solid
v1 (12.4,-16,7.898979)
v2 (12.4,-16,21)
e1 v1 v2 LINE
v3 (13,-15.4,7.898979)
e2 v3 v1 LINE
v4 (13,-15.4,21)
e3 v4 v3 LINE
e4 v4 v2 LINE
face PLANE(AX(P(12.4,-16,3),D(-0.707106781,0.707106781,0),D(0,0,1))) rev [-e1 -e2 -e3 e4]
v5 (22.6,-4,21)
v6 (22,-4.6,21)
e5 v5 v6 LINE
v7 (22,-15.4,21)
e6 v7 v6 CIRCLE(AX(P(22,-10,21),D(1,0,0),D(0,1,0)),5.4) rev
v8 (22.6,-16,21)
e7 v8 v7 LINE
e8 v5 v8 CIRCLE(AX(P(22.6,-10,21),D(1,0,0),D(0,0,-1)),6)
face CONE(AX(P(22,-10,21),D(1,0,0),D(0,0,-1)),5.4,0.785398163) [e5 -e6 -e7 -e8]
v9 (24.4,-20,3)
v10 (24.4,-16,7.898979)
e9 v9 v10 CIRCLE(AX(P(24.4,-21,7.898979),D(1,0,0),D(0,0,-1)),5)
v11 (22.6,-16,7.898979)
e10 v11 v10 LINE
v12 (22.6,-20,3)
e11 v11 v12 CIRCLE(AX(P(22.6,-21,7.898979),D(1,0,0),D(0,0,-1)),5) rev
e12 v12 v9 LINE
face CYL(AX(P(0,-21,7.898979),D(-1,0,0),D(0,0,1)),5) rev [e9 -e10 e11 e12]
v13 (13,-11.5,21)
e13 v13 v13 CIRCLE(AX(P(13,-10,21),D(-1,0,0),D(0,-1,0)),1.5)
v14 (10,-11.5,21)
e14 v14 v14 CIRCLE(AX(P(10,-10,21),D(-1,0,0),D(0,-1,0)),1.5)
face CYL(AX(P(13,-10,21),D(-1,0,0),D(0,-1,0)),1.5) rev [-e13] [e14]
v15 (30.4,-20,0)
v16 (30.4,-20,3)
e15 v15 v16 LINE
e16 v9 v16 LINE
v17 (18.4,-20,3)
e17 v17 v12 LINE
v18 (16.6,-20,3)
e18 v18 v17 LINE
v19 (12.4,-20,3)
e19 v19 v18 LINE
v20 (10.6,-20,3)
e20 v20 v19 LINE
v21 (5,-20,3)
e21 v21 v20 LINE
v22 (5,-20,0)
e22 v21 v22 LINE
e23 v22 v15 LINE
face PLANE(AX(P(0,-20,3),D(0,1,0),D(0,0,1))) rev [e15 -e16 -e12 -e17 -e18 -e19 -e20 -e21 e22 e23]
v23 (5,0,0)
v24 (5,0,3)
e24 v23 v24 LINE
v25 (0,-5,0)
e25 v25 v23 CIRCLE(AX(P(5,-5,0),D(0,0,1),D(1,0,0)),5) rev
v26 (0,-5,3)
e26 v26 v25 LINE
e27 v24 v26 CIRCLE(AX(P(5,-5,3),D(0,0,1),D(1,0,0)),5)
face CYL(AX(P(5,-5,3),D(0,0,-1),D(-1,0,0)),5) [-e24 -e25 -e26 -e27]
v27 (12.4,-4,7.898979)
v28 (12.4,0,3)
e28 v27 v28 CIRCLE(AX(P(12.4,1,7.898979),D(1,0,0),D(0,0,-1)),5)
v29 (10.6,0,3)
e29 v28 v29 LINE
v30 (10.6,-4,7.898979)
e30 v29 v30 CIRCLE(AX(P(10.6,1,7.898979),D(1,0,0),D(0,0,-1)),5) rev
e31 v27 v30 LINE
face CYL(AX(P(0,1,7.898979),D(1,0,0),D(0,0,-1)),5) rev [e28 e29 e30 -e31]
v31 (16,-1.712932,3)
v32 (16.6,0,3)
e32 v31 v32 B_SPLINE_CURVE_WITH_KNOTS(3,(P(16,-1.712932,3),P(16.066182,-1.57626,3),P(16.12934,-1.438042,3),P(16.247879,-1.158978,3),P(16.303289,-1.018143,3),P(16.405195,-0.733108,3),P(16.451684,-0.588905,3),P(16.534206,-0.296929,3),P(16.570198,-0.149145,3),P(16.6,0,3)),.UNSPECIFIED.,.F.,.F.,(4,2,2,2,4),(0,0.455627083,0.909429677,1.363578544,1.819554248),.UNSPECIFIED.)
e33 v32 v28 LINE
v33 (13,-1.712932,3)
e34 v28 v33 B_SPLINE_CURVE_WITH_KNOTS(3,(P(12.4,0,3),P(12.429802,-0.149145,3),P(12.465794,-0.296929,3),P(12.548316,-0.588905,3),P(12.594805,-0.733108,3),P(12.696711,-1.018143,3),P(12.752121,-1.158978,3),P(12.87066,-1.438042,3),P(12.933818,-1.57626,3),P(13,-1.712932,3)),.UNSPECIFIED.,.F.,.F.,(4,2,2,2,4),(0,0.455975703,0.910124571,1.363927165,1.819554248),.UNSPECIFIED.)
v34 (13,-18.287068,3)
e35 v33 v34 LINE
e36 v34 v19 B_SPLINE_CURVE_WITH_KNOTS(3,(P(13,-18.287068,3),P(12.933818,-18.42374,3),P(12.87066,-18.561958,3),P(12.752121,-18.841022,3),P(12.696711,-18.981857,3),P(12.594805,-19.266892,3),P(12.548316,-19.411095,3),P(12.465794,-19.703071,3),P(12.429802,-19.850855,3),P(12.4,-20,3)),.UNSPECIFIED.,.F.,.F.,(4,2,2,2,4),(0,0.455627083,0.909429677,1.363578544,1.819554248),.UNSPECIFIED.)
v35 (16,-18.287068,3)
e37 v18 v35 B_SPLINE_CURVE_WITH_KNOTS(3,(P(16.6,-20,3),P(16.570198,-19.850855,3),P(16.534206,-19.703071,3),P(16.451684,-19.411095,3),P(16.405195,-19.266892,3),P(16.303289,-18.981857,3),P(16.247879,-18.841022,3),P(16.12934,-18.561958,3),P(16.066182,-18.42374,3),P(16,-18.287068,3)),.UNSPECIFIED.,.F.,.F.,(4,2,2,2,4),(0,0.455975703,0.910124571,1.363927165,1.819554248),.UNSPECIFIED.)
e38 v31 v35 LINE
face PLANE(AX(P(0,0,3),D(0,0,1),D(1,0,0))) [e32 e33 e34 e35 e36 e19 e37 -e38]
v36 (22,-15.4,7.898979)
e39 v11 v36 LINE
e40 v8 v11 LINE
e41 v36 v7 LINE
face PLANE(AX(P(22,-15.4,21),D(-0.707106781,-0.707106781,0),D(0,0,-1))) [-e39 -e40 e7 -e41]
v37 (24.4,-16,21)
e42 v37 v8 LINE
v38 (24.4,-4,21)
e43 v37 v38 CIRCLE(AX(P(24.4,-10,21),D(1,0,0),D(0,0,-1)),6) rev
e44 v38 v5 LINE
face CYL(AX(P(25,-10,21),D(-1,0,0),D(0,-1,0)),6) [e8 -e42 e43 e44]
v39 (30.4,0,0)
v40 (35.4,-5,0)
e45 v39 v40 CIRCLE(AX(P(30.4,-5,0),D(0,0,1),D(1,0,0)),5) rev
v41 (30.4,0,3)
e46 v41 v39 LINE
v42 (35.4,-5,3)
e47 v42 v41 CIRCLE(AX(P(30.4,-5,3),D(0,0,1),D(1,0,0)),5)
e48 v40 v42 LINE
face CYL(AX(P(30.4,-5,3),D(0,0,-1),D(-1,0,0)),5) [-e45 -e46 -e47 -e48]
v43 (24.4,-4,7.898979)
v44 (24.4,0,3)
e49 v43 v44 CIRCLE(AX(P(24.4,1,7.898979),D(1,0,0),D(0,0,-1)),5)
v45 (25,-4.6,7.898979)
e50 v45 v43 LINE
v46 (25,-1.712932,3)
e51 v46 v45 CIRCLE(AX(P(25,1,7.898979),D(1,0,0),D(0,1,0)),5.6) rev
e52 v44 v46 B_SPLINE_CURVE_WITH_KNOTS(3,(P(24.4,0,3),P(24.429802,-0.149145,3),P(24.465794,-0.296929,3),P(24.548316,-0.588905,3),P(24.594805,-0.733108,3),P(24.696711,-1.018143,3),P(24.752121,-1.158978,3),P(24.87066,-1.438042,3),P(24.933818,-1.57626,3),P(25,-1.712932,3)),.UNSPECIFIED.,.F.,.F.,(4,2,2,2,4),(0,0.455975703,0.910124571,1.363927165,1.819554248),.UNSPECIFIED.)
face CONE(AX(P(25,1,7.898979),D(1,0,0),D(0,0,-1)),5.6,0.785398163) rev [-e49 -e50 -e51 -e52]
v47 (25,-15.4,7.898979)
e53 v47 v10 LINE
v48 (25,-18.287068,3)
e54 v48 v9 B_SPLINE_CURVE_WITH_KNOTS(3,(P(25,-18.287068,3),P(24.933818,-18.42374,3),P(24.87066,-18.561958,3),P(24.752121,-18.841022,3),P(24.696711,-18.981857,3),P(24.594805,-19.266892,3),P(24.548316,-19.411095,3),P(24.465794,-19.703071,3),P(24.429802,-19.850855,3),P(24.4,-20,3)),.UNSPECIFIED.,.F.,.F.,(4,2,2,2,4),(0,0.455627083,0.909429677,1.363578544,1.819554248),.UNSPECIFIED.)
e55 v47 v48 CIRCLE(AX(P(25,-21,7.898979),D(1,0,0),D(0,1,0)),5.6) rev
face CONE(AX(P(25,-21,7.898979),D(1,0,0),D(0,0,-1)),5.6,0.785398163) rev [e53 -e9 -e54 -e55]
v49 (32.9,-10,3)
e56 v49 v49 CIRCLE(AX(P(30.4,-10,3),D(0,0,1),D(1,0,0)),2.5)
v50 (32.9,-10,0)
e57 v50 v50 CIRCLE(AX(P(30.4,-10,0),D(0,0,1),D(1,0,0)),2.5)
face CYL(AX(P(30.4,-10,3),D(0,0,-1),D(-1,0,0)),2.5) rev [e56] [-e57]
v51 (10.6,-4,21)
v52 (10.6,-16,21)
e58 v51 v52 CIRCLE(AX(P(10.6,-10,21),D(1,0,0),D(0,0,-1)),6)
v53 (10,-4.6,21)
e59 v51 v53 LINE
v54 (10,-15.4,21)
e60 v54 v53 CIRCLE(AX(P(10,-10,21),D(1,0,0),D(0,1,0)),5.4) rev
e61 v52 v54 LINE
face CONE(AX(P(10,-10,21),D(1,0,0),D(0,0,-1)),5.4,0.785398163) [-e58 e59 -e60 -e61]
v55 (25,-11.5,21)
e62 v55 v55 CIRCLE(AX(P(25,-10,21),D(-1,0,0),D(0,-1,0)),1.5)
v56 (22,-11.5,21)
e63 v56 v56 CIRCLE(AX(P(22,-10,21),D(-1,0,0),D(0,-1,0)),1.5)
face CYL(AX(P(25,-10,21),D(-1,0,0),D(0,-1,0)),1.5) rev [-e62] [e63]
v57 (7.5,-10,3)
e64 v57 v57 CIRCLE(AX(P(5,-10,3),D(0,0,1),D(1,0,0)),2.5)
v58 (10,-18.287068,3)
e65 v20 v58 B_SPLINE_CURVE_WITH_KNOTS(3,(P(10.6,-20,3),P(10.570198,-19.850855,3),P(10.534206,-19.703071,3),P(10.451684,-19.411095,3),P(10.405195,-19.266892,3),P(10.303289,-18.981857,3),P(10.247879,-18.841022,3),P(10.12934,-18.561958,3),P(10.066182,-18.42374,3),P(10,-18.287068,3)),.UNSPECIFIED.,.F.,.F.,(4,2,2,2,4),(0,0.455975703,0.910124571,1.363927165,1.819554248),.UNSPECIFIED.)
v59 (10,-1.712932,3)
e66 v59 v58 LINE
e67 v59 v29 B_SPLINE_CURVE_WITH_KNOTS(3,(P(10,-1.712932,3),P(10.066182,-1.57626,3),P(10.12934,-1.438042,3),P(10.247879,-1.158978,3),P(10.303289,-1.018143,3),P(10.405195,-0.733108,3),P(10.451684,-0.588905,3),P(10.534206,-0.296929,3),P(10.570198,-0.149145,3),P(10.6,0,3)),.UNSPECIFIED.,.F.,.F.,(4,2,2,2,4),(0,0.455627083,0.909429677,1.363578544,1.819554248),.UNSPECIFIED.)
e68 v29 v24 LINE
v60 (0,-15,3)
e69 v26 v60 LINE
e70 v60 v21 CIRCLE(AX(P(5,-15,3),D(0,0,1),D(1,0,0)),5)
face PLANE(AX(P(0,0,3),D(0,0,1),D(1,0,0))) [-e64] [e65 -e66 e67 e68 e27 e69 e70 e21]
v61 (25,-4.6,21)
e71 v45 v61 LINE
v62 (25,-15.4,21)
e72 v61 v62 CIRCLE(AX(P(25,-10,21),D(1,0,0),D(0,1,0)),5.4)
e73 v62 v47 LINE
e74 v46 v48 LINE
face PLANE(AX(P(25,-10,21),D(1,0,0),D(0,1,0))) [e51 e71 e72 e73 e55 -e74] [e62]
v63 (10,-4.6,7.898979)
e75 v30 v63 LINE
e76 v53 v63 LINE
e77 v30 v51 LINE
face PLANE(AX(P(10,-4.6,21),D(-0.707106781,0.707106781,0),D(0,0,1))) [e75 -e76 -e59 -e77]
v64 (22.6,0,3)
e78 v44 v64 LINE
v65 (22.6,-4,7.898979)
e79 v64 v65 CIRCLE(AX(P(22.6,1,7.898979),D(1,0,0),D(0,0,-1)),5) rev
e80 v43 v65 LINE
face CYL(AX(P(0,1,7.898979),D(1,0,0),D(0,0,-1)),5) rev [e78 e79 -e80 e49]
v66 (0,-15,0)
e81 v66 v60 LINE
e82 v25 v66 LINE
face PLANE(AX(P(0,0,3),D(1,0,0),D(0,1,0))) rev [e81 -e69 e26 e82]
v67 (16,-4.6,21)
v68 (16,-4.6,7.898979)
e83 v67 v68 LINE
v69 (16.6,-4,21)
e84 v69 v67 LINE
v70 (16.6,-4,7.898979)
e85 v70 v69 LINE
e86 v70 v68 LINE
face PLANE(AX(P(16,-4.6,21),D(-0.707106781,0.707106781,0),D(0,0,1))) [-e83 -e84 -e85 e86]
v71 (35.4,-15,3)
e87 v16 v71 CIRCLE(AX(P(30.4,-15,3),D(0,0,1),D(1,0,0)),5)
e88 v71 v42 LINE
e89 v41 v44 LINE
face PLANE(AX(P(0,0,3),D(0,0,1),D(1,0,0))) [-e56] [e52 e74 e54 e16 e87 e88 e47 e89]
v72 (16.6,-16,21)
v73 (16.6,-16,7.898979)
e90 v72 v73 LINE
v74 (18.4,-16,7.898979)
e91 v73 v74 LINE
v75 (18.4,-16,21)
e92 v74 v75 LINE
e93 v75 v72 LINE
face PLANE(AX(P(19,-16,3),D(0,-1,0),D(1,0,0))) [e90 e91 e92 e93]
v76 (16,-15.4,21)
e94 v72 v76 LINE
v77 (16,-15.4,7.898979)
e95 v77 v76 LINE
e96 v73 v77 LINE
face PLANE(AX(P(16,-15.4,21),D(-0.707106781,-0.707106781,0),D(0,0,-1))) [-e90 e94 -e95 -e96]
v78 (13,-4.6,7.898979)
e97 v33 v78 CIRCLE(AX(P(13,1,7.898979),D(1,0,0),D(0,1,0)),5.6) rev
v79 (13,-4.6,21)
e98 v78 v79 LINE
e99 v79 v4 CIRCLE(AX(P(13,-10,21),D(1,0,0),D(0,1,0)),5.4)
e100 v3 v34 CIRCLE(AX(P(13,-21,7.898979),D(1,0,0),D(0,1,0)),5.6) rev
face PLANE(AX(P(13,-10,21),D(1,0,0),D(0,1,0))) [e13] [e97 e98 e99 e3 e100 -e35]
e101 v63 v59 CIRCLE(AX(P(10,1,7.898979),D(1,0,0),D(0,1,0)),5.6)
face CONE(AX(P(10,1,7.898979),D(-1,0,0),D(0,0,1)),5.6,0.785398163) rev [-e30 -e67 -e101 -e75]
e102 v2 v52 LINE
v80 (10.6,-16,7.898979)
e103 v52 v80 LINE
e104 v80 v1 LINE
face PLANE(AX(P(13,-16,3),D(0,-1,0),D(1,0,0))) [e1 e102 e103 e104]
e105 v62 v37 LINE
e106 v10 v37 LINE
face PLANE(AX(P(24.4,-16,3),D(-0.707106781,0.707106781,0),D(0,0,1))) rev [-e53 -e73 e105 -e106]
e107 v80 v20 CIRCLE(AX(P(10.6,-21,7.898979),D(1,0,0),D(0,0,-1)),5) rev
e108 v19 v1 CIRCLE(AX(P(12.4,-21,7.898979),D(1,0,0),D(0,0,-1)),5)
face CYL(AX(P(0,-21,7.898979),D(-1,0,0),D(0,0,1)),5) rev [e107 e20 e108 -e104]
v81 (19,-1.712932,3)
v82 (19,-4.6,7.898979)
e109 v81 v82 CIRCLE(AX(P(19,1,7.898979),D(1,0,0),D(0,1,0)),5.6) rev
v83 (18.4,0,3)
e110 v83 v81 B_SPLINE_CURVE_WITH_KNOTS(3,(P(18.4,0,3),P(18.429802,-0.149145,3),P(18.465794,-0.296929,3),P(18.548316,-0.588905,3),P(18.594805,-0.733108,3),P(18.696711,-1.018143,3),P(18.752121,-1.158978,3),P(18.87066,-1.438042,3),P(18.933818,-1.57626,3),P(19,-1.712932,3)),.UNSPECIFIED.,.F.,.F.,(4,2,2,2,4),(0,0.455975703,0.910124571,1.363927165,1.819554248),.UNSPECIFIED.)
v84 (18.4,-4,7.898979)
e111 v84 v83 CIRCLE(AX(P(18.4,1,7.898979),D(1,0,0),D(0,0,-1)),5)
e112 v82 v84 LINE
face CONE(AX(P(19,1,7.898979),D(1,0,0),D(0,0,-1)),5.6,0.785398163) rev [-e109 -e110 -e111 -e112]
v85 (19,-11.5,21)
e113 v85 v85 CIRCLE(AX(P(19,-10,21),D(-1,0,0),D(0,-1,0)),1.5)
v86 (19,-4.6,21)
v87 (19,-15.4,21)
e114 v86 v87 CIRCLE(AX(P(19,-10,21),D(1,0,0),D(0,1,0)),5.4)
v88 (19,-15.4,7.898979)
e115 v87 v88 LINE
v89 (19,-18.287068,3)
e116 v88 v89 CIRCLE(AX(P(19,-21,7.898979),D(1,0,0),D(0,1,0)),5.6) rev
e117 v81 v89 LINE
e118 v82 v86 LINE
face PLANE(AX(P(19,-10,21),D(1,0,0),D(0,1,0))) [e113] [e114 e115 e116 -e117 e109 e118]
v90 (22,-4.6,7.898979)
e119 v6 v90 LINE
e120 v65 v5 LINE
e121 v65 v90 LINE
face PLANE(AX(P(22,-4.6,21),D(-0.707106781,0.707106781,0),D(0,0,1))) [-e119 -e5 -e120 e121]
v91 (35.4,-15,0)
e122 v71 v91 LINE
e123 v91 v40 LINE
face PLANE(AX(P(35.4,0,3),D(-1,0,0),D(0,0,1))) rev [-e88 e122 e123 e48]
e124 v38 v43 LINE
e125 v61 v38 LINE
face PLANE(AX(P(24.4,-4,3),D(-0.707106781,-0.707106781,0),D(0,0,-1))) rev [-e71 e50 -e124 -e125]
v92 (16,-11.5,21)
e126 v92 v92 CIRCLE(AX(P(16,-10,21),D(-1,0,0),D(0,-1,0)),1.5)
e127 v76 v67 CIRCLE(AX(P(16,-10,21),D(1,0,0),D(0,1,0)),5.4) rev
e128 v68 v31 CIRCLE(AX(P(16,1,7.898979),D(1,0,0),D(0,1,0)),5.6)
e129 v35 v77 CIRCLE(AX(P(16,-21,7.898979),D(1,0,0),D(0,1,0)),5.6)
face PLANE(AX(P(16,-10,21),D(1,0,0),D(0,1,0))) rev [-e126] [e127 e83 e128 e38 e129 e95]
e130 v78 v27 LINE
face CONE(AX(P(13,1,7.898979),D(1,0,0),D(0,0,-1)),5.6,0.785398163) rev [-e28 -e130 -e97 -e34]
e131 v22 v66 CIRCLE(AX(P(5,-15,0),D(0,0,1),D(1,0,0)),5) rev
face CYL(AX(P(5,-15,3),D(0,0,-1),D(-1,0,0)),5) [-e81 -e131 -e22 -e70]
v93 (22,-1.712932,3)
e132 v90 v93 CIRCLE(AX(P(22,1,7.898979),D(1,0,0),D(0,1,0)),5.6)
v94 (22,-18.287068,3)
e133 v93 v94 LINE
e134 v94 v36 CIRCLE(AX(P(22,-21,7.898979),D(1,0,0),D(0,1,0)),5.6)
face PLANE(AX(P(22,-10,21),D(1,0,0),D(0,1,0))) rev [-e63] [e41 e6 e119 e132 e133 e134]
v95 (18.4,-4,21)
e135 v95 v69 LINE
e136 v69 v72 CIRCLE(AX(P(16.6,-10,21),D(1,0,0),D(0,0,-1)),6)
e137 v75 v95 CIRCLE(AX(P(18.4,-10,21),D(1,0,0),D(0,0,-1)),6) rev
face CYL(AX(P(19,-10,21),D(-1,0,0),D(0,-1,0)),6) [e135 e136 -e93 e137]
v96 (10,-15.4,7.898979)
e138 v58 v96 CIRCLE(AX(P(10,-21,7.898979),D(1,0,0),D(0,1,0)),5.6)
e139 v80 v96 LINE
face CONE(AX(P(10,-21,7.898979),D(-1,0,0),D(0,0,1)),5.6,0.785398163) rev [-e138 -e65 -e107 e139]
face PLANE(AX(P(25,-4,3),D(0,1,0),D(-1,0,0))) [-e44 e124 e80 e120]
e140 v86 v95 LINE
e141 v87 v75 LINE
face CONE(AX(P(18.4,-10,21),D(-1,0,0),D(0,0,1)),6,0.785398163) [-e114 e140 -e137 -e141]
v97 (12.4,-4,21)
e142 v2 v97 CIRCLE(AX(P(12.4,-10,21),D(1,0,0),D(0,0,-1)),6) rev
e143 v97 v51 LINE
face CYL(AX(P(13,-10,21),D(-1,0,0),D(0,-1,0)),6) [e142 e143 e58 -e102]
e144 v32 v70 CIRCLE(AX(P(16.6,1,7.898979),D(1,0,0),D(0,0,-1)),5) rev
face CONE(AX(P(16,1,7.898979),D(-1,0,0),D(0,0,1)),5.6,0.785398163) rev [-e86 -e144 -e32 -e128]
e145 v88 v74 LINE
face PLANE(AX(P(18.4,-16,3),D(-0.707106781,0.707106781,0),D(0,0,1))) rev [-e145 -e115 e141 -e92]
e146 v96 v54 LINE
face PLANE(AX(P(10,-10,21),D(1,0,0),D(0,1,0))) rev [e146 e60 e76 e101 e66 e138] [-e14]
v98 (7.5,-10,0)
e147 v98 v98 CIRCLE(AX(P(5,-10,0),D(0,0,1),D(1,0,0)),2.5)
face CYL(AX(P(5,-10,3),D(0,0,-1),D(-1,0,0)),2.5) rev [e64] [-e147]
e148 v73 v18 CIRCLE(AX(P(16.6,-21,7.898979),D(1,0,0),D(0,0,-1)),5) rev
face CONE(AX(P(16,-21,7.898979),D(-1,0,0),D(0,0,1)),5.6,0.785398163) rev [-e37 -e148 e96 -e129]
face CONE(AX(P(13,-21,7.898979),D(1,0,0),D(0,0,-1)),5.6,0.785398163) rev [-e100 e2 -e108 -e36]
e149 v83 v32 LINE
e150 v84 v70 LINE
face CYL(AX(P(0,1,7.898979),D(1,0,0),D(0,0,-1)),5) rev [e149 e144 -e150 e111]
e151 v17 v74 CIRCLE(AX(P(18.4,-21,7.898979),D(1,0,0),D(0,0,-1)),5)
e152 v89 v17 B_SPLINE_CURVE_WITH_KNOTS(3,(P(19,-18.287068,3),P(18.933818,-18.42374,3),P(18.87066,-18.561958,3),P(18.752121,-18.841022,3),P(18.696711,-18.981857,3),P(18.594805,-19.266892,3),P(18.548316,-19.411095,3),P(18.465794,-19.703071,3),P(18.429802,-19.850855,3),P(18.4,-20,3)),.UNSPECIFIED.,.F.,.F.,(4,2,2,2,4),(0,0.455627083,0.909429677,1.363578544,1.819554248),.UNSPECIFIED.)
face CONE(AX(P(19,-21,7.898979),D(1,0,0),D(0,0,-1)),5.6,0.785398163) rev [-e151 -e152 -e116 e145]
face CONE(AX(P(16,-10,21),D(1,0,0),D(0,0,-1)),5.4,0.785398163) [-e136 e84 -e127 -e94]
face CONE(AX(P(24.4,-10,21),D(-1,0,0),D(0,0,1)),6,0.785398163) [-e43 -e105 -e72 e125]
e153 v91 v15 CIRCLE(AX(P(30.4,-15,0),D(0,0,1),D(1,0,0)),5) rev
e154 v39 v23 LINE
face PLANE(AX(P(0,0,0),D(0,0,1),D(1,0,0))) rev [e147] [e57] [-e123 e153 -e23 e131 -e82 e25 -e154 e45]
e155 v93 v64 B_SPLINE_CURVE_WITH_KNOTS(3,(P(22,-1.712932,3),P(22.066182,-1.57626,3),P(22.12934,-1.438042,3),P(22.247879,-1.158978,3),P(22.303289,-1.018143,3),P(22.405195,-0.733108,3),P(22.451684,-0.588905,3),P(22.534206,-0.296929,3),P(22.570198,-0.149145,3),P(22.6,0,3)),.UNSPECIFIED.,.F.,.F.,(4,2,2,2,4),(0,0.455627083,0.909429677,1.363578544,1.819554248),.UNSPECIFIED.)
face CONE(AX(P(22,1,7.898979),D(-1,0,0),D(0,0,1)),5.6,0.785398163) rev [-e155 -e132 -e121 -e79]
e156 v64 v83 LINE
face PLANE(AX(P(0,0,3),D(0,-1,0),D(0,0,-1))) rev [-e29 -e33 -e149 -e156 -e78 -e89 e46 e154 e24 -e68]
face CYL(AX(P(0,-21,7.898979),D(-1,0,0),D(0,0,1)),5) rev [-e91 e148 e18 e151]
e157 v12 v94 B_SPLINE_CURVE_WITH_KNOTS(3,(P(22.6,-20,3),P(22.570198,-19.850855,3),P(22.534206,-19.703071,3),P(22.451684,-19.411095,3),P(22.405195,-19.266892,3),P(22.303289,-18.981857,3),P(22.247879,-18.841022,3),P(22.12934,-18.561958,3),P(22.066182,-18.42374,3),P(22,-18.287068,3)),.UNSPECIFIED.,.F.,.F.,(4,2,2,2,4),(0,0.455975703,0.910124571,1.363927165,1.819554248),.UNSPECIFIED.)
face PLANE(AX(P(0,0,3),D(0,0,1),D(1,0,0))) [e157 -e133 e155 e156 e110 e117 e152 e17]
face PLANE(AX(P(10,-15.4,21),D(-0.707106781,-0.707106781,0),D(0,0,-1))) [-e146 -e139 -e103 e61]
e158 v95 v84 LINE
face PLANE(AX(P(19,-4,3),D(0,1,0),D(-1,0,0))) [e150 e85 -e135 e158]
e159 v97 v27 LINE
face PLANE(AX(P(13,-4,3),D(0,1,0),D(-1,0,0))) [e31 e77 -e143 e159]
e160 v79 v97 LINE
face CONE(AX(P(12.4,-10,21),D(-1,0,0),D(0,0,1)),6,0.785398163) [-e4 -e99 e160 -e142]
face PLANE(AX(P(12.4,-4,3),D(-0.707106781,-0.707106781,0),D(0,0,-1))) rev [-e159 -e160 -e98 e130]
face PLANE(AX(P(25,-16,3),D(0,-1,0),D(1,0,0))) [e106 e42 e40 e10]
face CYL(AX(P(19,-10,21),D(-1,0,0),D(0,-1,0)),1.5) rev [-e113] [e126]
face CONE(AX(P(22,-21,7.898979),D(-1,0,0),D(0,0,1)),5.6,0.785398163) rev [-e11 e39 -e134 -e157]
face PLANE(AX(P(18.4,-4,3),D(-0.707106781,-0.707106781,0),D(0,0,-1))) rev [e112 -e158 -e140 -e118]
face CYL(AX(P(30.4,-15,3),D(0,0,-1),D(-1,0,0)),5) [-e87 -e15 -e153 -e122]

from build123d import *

# Parameters (mm, degrees)
SKETCH_1_W             = 35.4
SKETCH_1_H             = 20
SKETCH_1_R             = 2.5
EXTRUDE_1_DEPTH        = 3
EXTRUDE_START          = -10
SKETCH_3_R             = 1.5
EXTRUDE_2_DEPTH        = 3
PATTERN_LINEAR_1_COUNT = 3
PATTERN_LINEAR_1_PITCH = 6
FILLET_1_R             = 5
CHAMFER_1_SIZE         = 0.6


with BuildPart() as part:
    # 草图1 → 凸台-拉伸1 (new body)
    with BuildSketch(Plane.XY):
        with Locations((17.7, -10)):
            Rectangle(SKETCH_1_W, SKETCH_1_H)
        with Locations((5, -10)):
            Circle(SKETCH_1_R, mode=Mode.SUBTRACT)
        with Locations((30.4, -10)):
            Circle(SKETCH_1_R, mode=Mode.SUBTRACT)
    extrude(amount=EXTRUDE_1_DEPTH)

    # 草图3 → 凸台-拉伸2 (add)
    with BuildSketch(Plane.ZY.offset(EXTRUDE_START)):
        with BuildLine():
            Line((3, -4), (21, -4))
            ThreePointArc((21, -4), (27, -10), (21, -16))
            Line((21, -16), (3, -16))
            Line((3, -16), (3, -4))
        make_face()
        with Locations(Location((21, -10, 0), (0, 0, 270))):
            Circle(SKETCH_3_R, mode=Mode.SUBTRACT)
    extrude_2 = extrude(amount=-EXTRUDE_2_DEPTH)

    # 阵列(线性)1: 凸台-拉伸2 ×3
    with Locations(*[(i * PATTERN_LINEAR_1_PITCH, 0, 0) for i in range(1, PATTERN_LINEAR_1_COUNT)]):
        add(extrude_2)

    # 圆角1
    # the kernel refuses this fillet: 5 mm, written as the material it adds along each edge
    with BuildSketch(Plane(origin=(10, -16, 3), x_dir=(0, -1.0, 1.572297847473644e-12), z_dir=(1, 0, 0)), Plane(origin=(16, -16, 3), x_dir=(0, -1.0, 1.572297847473644e-12), z_dir=(1, 0, 0)), Plane(origin=(22, -16, 3), x_dir=(0, -1.0, 1.572297847473644e-12), z_dir=(1, 0, 0))) as fillet_1_piece_1:
        with BuildLine():
            CenterArc((5, -4.898979486), FILLET_1_R, 101.536959033, 78.463040967)
            Line((0, -4.898979486), (0, 0))
            Line((0, 0), (4, 0))
        make_face()
    extrude(amount=3)
    with BuildSketch(Plane(origin=(-2.247448714, -16, 3), x_dir=(0, -1.0, 1.572297847473644e-12), z_dir=(1, 0, 0))) as fillet_1_piece_2_section:
        with BuildLine():
            CenterArc((5, -4.898979486), FILLET_1_R, 101.536959033, 78.463040967)
            Line((0, -4.898979486), (0, 0))
            Line((0, 0), (4, 0))
        make_face()
    fillet_1_piece_2 = extrude(amount=27.494897428, mode=Mode.PRIVATE)
    fillet_1_piece_2 = split(fillet_1_piece_2, bisect_by=Plane(origin=(16, -16, 3), z_dir=(1, 0, 0)), keep=Keep.TOP, mode=Mode.PRIVATE)
    fillet_1_piece_2 = split(fillet_1_piece_2, bisect_by=Plane(origin=(19, -16, 3), z_dir=(-1, 0, 0)), keep=Keep.TOP, mode=Mode.PRIVATE)
    add(fillet_1_piece_2)
    with BuildSketch(Plane(origin=(-2.247448714, -16, 3), x_dir=(0, -1.0, 1.572297847473644e-12), z_dir=(1, 0, 0))) as fillet_1_piece_3_section:
        with BuildLine():
            CenterArc((5, -4.898979486), FILLET_1_R, 101.536959033, 78.463040967)
            Line((0, -4.898979486), (0, 0))
            Line((0, 0), (4, 0))
        make_face()
    fillet_1_piece_3 = extrude(amount=27.494897428, mode=Mode.PRIVATE)
    fillet_1_piece_3 = split(fillet_1_piece_3, bisect_by=Plane(origin=(25, -16, 3), z_dir=(-1, 0, 0)), keep=Keep.TOP, mode=Mode.PRIVATE)
    fillet_1_piece_3 = split(fillet_1_piece_3, bisect_by=Plane(origin=(22, -16, 3), z_dir=(1, 0, 0)), keep=Keep.TOP, mode=Mode.PRIVATE)
    add(fillet_1_piece_3)
    with BuildSketch(Plane(origin=(10, -4, 3), x_dir=(0, 1.0, 1.568078999980068e-12), z_dir=(1, 0, 0)), Plane(origin=(16, -4, 3), x_dir=(0, 1.0, 1.568078999980068e-12), z_dir=(1, 0, 0)), Plane(origin=(22, -4, 3), x_dir=(0, 1.0, 1.568078999980068e-12), z_dir=(1, 0, 0))) as fillet_1_piece_4:
        with BuildLine():
            CenterArc((5, 4.898979486), FILLET_1_R, 180, 78.463040967)
            Line((0, 4.898979486), (0, 0))
            Line((0, 0), (4, 0))
        make_face()
    extrude(amount=3)
    with BuildSketch(Plane(origin=(-2.247448714, -4, 3), x_dir=(0, 1.0, 1.568078999980068e-12), z_dir=(1, 0, 0))) as fillet_1_piece_5_section:
        with BuildLine():
            CenterArc((5, 4.898979486), FILLET_1_R, 180, 78.463040967)
            Line((0, 4.898979486), (0, 0))
            Line((0, 0), (4, 0))
        make_face()
    fillet_1_piece_5 = extrude(amount=27.494897428, mode=Mode.PRIVATE)
    fillet_1_piece_5 = split(fillet_1_piece_5, bisect_by=Plane(origin=(16, -4, 3), z_dir=(1, 0, 0)), keep=Keep.TOP, mode=Mode.PRIVATE)
    fillet_1_piece_5 = split(fillet_1_piece_5, bisect_by=Plane(origin=(19, -4, 3), z_dir=(-1, 0, 0)), keep=Keep.TOP, mode=Mode.PRIVATE)
    add(fillet_1_piece_5)
    with BuildSketch(Plane(origin=(-2.247448714, -4, 3), x_dir=(0, 1.0, 1.568078999980068e-12), z_dir=(1, 0, 0))) as fillet_1_piece_6_section:
        with BuildLine():
            CenterArc((5, 4.898979486), FILLET_1_R, 180, 78.463040967)
            Line((0, 4.898979486), (0, 0))
            Line((0, 0), (4, 0))
        make_face()
    fillet_1_piece_6 = extrude(amount=27.494897428, mode=Mode.PRIVATE)
    fillet_1_piece_6 = split(fillet_1_piece_6, bisect_by=Plane(origin=(25, -4, 3), z_dir=(-1, 0, 0)), keep=Keep.TOP, mode=Mode.PRIVATE)
    fillet_1_piece_6 = split(fillet_1_piece_6, bisect_by=Plane(origin=(22, -4, 3), z_dir=(1, 0, 0)), keep=Keep.TOP, mode=Mode.PRIVATE)
    add(fillet_1_piece_6)
    with BuildSketch(Plane(origin=(3.752551286, -16, 3), x_dir=(0, -1.0, 1.572297847473644e-12), z_dir=(1, 0, 0))) as fillet_1_piece_7_section:
        with BuildLine():
            CenterArc((5, -4.898979486), FILLET_1_R, 101.536959033, 78.463040967)
            Line((0, -4.898979486), (0, 0))
            Line((0, 0), (4, 0))
        make_face()
    fillet_1_piece_7 = extrude(amount=27.494897428, mode=Mode.PRIVATE)
    fillet_1_piece_7 = split(fillet_1_piece_7, bisect_by=Plane(origin=(10, -16, 3), z_dir=(1, 0, 0)), keep=Keep.TOP, mode=Mode.PRIVATE)
    fillet_1_piece_7 = split(fillet_1_piece_7, bisect_by=Plane(origin=(13, -16, 3), z_dir=(-1, 0, 0)), keep=Keep.TOP, mode=Mode.PRIVATE)
    add(fillet_1_piece_7)
    with BuildSketch(Plane(origin=(3.752551286, -16, 3), x_dir=(0, -1.0, 1.572297847473644e-12), z_dir=(1, 0, 0))) as fillet_1_piece_8_section:
        with BuildLine():
            CenterArc((5, -4.898979486), FILLET_1_R, 101.536959033, 78.463040967)
            Line((0, -4.898979486), (0, 0))
            Line((0, 0), (4, 0))
        make_face()
    fillet_1_piece_8 = extrude(amount=27.494897428, mode=Mode.PRIVATE)
    fillet_1_piece_8 = split(fillet_1_piece_8, bisect_by=Plane(origin=(25, -16, 3), z_dir=(-1, 0, 0)), keep=Keep.TOP, mode=Mode.PRIVATE)
    fillet_1_piece_8 = split(fillet_1_piece_8, bisect_by=Plane(origin=(22, -16, 3), z_dir=(1, 0, 0)), keep=Keep.TOP, mode=Mode.PRIVATE)
    add(fillet_1_piece_8)
    with BuildSketch(Plane(origin=(3.752551286, -4, 3), x_dir=(0, 1.0, 1.568078999980068e-12), z_dir=(1, 0, 0))) as fillet_1_piece_9_section:
        with BuildLine():
            CenterArc((5, 4.898979486), FILLET_1_R, 180, 78.463040967)
            Line((0, 4.898979486), (0, 0))
            Line((0, 0), (4, 0))
        make_face()
    fillet_1_piece_9 = extrude(amount=27.494897428, mode=Mode.PRIVATE)
    fillet_1_piece_9 = split(fillet_1_piece_9, bisect_by=Plane(origin=(10, -4, 3), z_dir=(1, 0, 0)), keep=Keep.TOP, mode=Mode.PRIVATE)
    fillet_1_piece_9 = split(fillet_1_piece_9, bisect_by=Plane(origin=(13, -4, 3), z_dir=(-1, 0, 0)), keep=Keep.TOP, mode=Mode.PRIVATE)
    add(fillet_1_piece_9)
    with BuildSketch(Plane(origin=(3.752551286, -4, 3), x_dir=(0, 1.0, 1.568078999980068e-12), z_dir=(1, 0, 0))) as fillet_1_piece_10_section:
        with BuildLine():
            CenterArc((5, 4.898979486), FILLET_1_R, 180, 78.463040967)
            Line((0, 4.898979486), (0, 0))
            Line((0, 0), (4, 0))
        make_face()
    fillet_1_piece_10 = extrude(amount=27.494897428, mode=Mode.PRIVATE)
    fillet_1_piece_10 = split(fillet_1_piece_10, bisect_by=Plane(origin=(25, -4, 3), z_dir=(-1, 0, 0)), keep=Keep.TOP, mode=Mode.PRIVATE)
    fillet_1_piece_10 = split(fillet_1_piece_10, bisect_by=Plane(origin=(22, -4, 3), z_dir=(1, 0, 0)), keep=Keep.TOP, mode=Mode.PRIVATE)
    add(fillet_1_piece_10)
    with BuildSketch(Plane(origin=(9.752551286, -16, 3), x_dir=(0, -1.0, 1.572297847473644e-12), z_dir=(1, 0, 0))) as fillet_1_piece_11_section:
        with BuildLine():
            CenterArc((5, -4.898979486), FILLET_1_R, 101.536959033, 78.463040967)
            Line((0, -4.898979486), (0, 0))
            Line((0, 0), (4, 0))
        make_face()
    fillet_1_piece_11 = extrude(amount=27.494897428, mode=Mode.PRIVATE)
    fillet_1_piece_11 = split(fillet_1_piece_11, bisect_by=Plane(origin=(10, -16, 3), z_dir=(1, 0, 0)), keep=Keep.TOP, mode=Mode.PRIVATE)
    fillet_1_piece_11 = split(fillet_1_piece_11, bisect_by=Plane(origin=(13, -16, 3), z_dir=(-1, 0, 0)), keep=Keep.TOP, mode=Mode.PRIVATE)
    add(fillet_1_piece_11)
    with BuildSketch(Plane(origin=(9.752551286, -16, 3), x_dir=(0, -1.0, 1.572297847473644e-12), z_dir=(1, 0, 0))) as fillet_1_piece_12_section:
        with BuildLine():
            CenterArc((5, -4.898979486), FILLET_1_R, 101.536959033, 78.463040967)
            Line((0, -4.898979486), (0, 0))
            Line((0, 0), (4, 0))
        make_face()
    fillet_1_piece_12 = extrude(amount=27.494897428, mode=Mode.PRIVATE)
    fillet_1_piece_12 = split(fillet_1_piece_12, bisect_by=Plane(origin=(16, -16, 3), z_dir=(1, 0, 0)), keep=Keep.TOP, mode=Mode.PRIVATE)
    fillet_1_piece_12 = split(fillet_1_piece_12, bisect_by=Plane(origin=(19, -16, 3), z_dir=(-1, 0, 0)), keep=Keep.TOP, mode=Mode.PRIVATE)
    add(fillet_1_piece_12)
    with BuildSketch(Plane(origin=(9.752551286, -4, 3), x_dir=(0, 1.0, 1.568078999980068e-12), z_dir=(1, 0, 0))) as fillet_1_piece_13_section:
        with BuildLine():
            CenterArc((5, 4.898979486), FILLET_1_R, 180, 78.463040967)
            Line((0, 4.898979486), (0, 0))
            Line((0, 0), (4, 0))
        make_face()
    fillet_1_piece_13 = extrude(amount=27.494897428, mode=Mode.PRIVATE)
    fillet_1_piece_13 = split(fillet_1_piece_13, bisect_by=Plane(origin=(10, -4, 3), z_dir=(1, 0, 0)), keep=Keep.TOP, mode=Mode.PRIVATE)
    fillet_1_piece_13 = split(fillet_1_piece_13, bisect_by=Plane(origin=(13, -4, 3), z_dir=(-1, 0, 0)), keep=Keep.TOP, mode=Mode.PRIVATE)
    add(fillet_1_piece_13)
    with BuildSketch(Plane(origin=(9.752551286, -4, 3), x_dir=(0, 1.0, 1.568078999980068e-12), z_dir=(1, 0, 0))) as fillet_1_piece_14_section:
        with BuildLine():
            CenterArc((5, 4.898979486), FILLET_1_R, 180, 78.463040967)
            Line((0, 4.898979486), (0, 0))
            Line((0, 0), (4, 0))
        make_face()
    fillet_1_piece_14 = extrude(amount=27.494897428, mode=Mode.PRIVATE)
    fillet_1_piece_14 = split(fillet_1_piece_14, bisect_by=Plane(origin=(16, -4, 3), z_dir=(1, 0, 0)), keep=Keep.TOP, mode=Mode.PRIVATE)
    fillet_1_piece_14 = split(fillet_1_piece_14, bisect_by=Plane(origin=(19, -4, 3), z_dir=(-1, 0, 0)), keep=Keep.TOP, mode=Mode.PRIVATE)
    add(fillet_1_piece_14)
    # the kernel refuses this fillet: 5 mm, written as the material it takes off along each edge
    with BuildSketch(Plane(origin=(0, 0, -12.5), x_dir=(1, 0, 0), z_dir=(0, 0, 1)), Plane(origin=(35.4, -20, -12.5), x_dir=(-1, 0, 0), z_dir=(0, 0, 1))) as fillet_1_2_piece_1:
        with BuildLine():
            CenterArc((FILLET_1_R, -FILLET_1_R), FILLET_1_R, 90, 90)
            Line((0, -FILLET_1_R), (0, 0))
            Line((0, 0), (FILLET_1_R, 0))
        make_face()
    extrude(amount=28, mode=Mode.SUBTRACT)
    with BuildSketch(Plane(origin=(35.4, 0, -12.5), x_dir=(-1, 0, 0), z_dir=(0, 0, 1)), Plane(origin=(0, -20, -12.5), x_dir=(1, 0, 0), z_dir=(0, 0, 1))) as fillet_1_2_piece_2:
        with BuildLine():
            CenterArc((FILLET_1_R, FILLET_1_R), FILLET_1_R, 180, 90)
            Line((0, FILLET_1_R), (0, 0))
            Line((0, 0), (FILLET_1_R, 0))
        make_face()
    extrude(amount=28, mode=Mode.SUBTRACT)

    # 倒角1
    chamfer_1_edges = [part.edges().sort_by_distance(p)[0] for p in [
        (13, -4, 14.449489743),
        (13, -10, 27),
        (10, -10, 27),
        (10, -4, 14.449489743),
        (19, -4, 14.449489743),
        (19, -10, 27),
        (16, -10, 27),
        (16, -4, 14.449489743),
        (25, -4, 14.449489743),
        (25, -10, 27),
        (22, -10, 27),
        (22, -4, 14.449489743),
        (10, -16, 14.449489743),
        (13, -16, 14.449489743),
        (16, -16, 14.449489743),
        (19, -16, 14.449489743),
        (22, -16, 14.449489743),
        (25, -16, 14.449489743),
        (10, -17.127016654, 4.736701825),
        (13, -17.127016654, 4.736701825),
        (16, -17.127016654, 4.736701825),
        (19, -17.127016654, 4.736701825),
        (22, -17.127016654, 4.736701825),
        (25, -17.127016654, 4.736701825),
        (10, -2.872983346, 4.736701825),
        (13, -2.872983346, 4.736701825),
        (16, -2.872983346, 4.736701825),
        (19, -2.872983346, 4.736701825),
        (22, -2.872983346, 4.736701825),
        (25, -2.872983346, 4.736701825),
    ]]
    chamfer(chamfer_1_edges, length=CHAMFER_1_SIZE)


solid = part.part
